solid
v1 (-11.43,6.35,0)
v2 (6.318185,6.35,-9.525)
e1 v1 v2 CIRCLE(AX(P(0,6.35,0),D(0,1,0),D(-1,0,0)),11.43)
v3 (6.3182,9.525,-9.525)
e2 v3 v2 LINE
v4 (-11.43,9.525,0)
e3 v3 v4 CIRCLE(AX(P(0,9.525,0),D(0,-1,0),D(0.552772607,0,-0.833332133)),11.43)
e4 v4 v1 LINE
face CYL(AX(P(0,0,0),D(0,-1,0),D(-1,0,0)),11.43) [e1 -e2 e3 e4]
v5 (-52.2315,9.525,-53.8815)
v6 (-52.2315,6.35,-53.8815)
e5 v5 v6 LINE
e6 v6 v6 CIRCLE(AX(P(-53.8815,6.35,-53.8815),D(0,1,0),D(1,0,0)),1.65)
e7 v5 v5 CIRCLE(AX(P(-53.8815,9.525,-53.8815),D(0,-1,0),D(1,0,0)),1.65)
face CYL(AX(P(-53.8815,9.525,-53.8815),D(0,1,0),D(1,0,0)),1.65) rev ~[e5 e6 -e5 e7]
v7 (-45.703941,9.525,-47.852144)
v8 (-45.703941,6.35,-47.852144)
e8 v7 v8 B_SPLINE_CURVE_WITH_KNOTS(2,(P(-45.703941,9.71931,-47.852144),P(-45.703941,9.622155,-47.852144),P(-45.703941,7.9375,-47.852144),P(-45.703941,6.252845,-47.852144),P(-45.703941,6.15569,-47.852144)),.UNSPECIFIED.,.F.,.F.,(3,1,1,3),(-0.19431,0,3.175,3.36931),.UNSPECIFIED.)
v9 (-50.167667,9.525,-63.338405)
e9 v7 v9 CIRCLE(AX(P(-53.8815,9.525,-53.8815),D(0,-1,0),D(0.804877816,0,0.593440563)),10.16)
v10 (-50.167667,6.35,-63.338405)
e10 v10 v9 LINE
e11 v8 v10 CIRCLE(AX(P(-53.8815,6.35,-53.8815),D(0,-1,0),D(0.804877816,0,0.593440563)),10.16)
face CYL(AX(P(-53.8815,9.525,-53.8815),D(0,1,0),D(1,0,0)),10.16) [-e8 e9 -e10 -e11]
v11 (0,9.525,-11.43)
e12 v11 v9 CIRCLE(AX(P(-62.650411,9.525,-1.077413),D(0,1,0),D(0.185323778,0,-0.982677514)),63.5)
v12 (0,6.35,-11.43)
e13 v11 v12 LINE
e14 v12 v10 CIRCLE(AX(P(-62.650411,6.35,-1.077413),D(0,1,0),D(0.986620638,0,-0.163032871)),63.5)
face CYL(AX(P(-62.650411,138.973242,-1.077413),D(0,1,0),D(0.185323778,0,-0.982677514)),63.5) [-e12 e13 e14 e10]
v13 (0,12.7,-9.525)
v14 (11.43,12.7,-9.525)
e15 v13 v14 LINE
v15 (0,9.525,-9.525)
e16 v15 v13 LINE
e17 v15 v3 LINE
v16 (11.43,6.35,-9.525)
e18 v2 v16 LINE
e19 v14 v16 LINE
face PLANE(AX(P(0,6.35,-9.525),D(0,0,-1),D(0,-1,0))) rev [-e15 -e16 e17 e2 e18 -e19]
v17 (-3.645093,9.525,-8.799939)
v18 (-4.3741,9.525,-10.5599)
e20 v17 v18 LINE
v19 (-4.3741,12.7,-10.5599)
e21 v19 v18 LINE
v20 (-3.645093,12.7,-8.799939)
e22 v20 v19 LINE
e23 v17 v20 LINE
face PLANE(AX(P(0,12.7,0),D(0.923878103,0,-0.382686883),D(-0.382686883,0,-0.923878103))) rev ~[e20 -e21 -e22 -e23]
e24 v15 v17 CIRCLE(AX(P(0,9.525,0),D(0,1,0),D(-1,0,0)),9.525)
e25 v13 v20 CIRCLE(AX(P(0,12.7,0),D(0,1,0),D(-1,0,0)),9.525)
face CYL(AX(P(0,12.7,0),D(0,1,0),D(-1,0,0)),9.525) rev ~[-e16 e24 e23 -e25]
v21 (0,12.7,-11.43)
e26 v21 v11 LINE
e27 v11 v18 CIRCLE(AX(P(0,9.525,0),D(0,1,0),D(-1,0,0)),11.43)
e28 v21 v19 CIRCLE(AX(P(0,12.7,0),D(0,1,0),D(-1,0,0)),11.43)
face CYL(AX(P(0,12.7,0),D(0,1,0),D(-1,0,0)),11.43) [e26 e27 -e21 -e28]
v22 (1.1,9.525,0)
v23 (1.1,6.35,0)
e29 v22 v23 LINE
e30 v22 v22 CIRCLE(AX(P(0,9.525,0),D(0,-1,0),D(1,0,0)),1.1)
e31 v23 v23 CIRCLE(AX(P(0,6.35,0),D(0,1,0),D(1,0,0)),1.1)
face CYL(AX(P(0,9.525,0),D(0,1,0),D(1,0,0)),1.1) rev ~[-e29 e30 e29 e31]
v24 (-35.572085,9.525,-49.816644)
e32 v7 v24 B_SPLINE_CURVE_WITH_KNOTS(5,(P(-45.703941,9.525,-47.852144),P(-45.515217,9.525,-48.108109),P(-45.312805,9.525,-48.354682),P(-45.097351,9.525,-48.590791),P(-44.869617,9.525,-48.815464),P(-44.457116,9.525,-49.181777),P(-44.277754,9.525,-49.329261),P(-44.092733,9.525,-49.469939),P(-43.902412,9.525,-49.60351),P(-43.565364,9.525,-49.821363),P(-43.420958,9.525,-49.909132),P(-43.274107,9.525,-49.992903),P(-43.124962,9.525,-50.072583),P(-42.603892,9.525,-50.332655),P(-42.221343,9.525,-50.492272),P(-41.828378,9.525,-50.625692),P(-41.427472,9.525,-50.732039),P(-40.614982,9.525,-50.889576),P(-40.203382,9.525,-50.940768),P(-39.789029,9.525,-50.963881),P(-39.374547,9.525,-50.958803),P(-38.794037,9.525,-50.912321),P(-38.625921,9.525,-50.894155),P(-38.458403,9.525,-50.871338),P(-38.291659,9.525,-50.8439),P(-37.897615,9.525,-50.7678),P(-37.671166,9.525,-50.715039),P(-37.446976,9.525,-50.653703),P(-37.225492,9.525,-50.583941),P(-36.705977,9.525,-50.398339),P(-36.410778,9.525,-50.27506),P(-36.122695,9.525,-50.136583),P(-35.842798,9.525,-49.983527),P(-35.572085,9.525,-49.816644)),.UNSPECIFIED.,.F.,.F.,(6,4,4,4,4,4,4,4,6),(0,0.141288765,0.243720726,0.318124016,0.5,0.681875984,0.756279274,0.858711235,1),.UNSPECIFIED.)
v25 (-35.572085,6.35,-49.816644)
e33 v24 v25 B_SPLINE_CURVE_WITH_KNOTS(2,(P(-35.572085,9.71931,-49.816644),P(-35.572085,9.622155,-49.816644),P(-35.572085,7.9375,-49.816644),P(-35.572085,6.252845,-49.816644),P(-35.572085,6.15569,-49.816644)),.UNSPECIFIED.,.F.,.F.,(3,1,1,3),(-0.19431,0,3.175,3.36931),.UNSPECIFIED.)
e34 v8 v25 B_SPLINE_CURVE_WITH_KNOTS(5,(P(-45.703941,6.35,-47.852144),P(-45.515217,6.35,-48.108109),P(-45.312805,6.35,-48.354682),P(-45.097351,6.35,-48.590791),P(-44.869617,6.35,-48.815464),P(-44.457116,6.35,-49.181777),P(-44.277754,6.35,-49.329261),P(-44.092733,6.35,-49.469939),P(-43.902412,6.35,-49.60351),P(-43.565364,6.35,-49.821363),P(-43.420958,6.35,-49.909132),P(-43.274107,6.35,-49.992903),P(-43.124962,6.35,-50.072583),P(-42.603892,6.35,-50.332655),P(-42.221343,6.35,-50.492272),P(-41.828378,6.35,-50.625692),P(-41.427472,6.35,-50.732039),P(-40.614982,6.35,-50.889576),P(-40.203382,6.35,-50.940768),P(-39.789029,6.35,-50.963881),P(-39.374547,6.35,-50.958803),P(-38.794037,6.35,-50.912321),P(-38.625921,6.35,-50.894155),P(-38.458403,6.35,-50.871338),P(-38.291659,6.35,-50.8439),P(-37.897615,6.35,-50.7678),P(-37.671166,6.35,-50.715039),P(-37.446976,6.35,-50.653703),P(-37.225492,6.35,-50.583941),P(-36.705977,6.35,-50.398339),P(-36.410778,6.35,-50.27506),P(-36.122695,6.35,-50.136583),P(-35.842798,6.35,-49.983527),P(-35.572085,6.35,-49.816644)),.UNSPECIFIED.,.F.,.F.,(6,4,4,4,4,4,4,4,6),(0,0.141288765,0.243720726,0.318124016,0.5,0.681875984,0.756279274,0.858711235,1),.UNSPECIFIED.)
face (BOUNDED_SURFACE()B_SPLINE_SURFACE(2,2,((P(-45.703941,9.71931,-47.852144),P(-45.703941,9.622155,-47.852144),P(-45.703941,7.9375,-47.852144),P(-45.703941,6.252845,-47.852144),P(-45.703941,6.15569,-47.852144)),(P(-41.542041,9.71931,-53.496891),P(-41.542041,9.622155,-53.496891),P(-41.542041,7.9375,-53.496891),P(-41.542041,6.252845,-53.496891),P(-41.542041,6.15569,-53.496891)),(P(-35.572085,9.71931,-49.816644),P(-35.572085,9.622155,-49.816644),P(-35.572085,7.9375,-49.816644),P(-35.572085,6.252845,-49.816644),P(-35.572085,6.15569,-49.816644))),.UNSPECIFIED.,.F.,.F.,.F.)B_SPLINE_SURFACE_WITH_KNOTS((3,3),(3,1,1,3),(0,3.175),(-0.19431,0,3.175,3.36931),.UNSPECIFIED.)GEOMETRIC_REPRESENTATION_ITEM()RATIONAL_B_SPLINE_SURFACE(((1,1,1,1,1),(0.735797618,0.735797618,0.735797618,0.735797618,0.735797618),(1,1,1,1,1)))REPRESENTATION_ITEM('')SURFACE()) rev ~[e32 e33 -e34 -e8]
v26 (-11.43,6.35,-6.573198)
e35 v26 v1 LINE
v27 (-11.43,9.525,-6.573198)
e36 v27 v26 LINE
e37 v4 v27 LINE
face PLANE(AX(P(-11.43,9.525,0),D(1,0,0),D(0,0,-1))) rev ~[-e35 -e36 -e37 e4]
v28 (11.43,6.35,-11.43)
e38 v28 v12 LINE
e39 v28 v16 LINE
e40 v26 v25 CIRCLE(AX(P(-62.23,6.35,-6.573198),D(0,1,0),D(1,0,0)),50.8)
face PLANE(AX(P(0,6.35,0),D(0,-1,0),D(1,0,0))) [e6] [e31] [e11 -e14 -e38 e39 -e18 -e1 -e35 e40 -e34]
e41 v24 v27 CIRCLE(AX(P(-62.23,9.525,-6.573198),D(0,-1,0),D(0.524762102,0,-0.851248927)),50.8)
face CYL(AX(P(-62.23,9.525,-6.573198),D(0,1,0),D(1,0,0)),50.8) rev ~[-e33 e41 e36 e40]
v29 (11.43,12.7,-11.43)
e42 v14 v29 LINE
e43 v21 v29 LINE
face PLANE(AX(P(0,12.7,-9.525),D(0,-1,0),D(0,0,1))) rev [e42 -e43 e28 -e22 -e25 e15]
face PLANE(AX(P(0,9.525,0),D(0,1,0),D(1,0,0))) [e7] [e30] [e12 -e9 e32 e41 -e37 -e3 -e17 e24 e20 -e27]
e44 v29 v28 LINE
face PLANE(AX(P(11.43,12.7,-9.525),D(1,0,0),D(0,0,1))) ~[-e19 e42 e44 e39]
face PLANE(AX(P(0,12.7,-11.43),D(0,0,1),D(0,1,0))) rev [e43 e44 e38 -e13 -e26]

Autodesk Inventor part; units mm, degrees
ref_plane "YZ Plane" through (0, 0, 0) normal (1, 0, 0) x (0, 1, 0)
ref_plane "XZ Plane" through (0, 0, 0) normal (0, 1, 0) x (-1, 0, 0)
ref_plane "XY Plane" through (0, 0, 0) normal (0, 0, 1) x (1, 0, 0)
sketch "Sketch1" plane through (0, 0, 0) normal (0, 1, 0) x (-1, 0, 0)
  circle A0 centre (0, 0) radius 11.43
  circle A1 centre (0, 0) radius 9.525
  dimension "d0" = 22.86
  dimension "d1" = 19.05
extrude "Extrusion1" add sketch "Sketch1" along normal blind 6.35
sketch "Sketch2" plane through (0, 6.35, 0) normal (0, 1, 0) x (1, 0, 0)
  circle A0 centre (0, 0) radius 11.43
extrude "Extrusion2" add sketch "Sketch2" along normal blind 3.175
sketch "Sketch3" plane through (0, 9.525, 0) normal (0, 1, 0) x (1, 0, 0)
  circle A0 centre (0, 0) radius 1.1
  dimension "d6" = 2.2
extrude "Extrusion3" cut sketch "Sketch3" against normal blind 7.9375
sketch "Sketch6" plane through (0, 0, 0) normal (0, -1, 0) x (1, 0, 0)
  line L0 (-16.0948, 0) -> (0, 0)
  line L1 (0, 0) -> (0, -15.3841)
  line L2 (0, -15.3841) -> (-16.0948, -15.3841)
  line L3 (-16.0948, -15.3841) -> (-16.0948, 0)
  line L4 (-16.0948, 14.6504) -> (12.3807, 14.6504)
  line L5 (12.3807, 14.6504) -> (12.3807, -15.3841)
  line L6 (12.3807, -15.3841) -> (-16.0948, -15.3841)
  line L7 (-16.0948, -15.3841) -> (-16.0948, 14.6504)
extrude "Extrusion6" cut sketch "Sketch6" against normal blind 6.35 contours L7 L4 L5 L6 L1 L0
sketch "Sketch7" plane through (0, 0, -9.525) normal (1, 0, 0) x (0, 0, -1)
  line L0 (1.905, 6.35) -> (-20.955, 6.35) projected
  line L1 (1.905, 6.35) -> (0, 6.35)
  line L2 (0, 6.35) -> (0, 0)
  line L3 (0, 0) -> (1.905, 0)
  line L4 (1.905, 0) -> (1.905, 6.35)
  point P0 (-9.525, 0)
  point P1 (-9.525, 6.35)
extrude "Extrusion7" add sketch "Sketch7" along normal blind 11.43
sketch "Sketch8" plane through (0, 0, 0) normal (0, -1, 0) x (1, 0, 0)
  line L0 (0, 0) -> (-10.5625, -10.5625)
  line L1 (0, 0) -> (14.9376, 0) construction
  line L2 (-10.5625, -10.5625) -> (-17.6997, 3.3244)
  line L3 (-17.6997, 3.3244) -> (0, 0)
  dimension "d18" = 135
extrude "Extrusion8" cut sketch "Sketch8" against normal blind 6.35
sketch "Sketch9" plane through (0, 0, 0) normal (0, -1, 0) x (1, 0, 0)
  line L0 (0, 0) -> (-6.0166, -14.5254)
  line L1 (0, 0) -> (15.7222, 0) construction
  line L2 (-6.0166, -14.5254) -> (-13.1372, -7.2627)
  line L3 (-13.1372, -7.2627) -> (0, 0)
  dimension "d21" = 112.5
extrude "Extrusion9" cut sketch "Sketch9" against normal blind 6.35
sketch "Sketch13" plane through (0, 9.525, 0) normal (0, 1, 0) x (1, 0, 0)
  line L0 (0, 0) -> (-53.8815, 53.8815)
  line L1 (0, 0) -> (76.2, 0) construction
  circle A0 centre (-53.8815, 53.8815) radius 10.16
  arc A1 (6.3182, 9.525) -> (0, 11.43) centre (0, 0) ccw projected
  line L2 (0, 11.43) -> (0, 53.8815)
  line L3 (0, 53.8815) -> (-50.1886, 63.3466)
  arc A2 (-4.3741, 10.5599) -> (6.3182, 9.525) centre (0, 0) ccw projected
  line L4 (-11.43, 0) -> (-11.43, 42.4515)
  line L5 (-11.43, 42.4515) -> (-43.7215, 53.8815)
  circle A3 centre (-53.8815, 53.8815) radius 1.65
  circle A4 centre (0, 0) radius 1.1 projected
  circle A5 centre (0, 0) radius 1.65
  dimension "d44" = 76.2
  dimension "d45" = 135
  dimension "d46" = 20.32
  dimension "d47" = 100.68
  dimension "d48" = 3.3
  dimension "d49" = 3.3
extrude "Extrusion13" add sketch "Sketch13" against normal blind 3.175 contours A2 L4 L0 | L0 L4 L5 A0 L3 L2 A1 A2 | A0
fillet "Fillet3" radius 50.8 1 edges at (-11.43, 7.9375, -42.4515)
fillet "Fillet4" radius 7.62 1 edges at (-43.7215, 7.9375, -53.8815)
fillet "Fillet5" radius 63.5 1 edges at (0, 7.9375, -53.8815)
mirror "Mirror1" about plane through (0, 6.35, -11.43) normal (0, 1, 0) of "Extrusion1", "Extrusion7"
sketch "Sketch14" plane through (0, 12.7, -11.43) normal (0, 1, 0) x (1, 0, 0)
  line L0 (0, -11.43) -> (-4.3741, -0.8701)
  line L1 (-4.3741, -0.8701) -> (-16.9777, -0.8701)
  line L2 (-16.9777, -0.8701) -> (-16.9777, -27.9599)
  line L3 (-16.9777, -27.9599) -> (23.6628, -27.9599)
  line L4 (0, -1.905) -> (11.43, -1.905) projected
  line L5 (23.6628, -27.9599) -> (11.43, -1.905)
  line L6 (11.43, -1.905) -> (0, -1.905)
  line L7 (0, -1.905) -> (0, -11.43)
extrude "Extrusion14" cut sketch "Sketch14" against normal blind 3.175
sketch "Sketch15" plane through (0, 6.35, 0) normal (0, -1, 0) x (1, 0, 0)
  line L0 (-24.6585, 25.4032) -> (37.4015, 25.4032)
  line L1 (37.4015, 25.4032) -> (37.4015, -39.3047)
  line L2 (37.4015, -39.3047) -> (-24.6585, -39.3047)
  line L3 (-24.6585, -39.3047) -> (-24.6585, 25.4032)
  point P0 (0, 0)
extrude "Extrusion15" cut sketch "Sketch15" along normal blind 26.9875
